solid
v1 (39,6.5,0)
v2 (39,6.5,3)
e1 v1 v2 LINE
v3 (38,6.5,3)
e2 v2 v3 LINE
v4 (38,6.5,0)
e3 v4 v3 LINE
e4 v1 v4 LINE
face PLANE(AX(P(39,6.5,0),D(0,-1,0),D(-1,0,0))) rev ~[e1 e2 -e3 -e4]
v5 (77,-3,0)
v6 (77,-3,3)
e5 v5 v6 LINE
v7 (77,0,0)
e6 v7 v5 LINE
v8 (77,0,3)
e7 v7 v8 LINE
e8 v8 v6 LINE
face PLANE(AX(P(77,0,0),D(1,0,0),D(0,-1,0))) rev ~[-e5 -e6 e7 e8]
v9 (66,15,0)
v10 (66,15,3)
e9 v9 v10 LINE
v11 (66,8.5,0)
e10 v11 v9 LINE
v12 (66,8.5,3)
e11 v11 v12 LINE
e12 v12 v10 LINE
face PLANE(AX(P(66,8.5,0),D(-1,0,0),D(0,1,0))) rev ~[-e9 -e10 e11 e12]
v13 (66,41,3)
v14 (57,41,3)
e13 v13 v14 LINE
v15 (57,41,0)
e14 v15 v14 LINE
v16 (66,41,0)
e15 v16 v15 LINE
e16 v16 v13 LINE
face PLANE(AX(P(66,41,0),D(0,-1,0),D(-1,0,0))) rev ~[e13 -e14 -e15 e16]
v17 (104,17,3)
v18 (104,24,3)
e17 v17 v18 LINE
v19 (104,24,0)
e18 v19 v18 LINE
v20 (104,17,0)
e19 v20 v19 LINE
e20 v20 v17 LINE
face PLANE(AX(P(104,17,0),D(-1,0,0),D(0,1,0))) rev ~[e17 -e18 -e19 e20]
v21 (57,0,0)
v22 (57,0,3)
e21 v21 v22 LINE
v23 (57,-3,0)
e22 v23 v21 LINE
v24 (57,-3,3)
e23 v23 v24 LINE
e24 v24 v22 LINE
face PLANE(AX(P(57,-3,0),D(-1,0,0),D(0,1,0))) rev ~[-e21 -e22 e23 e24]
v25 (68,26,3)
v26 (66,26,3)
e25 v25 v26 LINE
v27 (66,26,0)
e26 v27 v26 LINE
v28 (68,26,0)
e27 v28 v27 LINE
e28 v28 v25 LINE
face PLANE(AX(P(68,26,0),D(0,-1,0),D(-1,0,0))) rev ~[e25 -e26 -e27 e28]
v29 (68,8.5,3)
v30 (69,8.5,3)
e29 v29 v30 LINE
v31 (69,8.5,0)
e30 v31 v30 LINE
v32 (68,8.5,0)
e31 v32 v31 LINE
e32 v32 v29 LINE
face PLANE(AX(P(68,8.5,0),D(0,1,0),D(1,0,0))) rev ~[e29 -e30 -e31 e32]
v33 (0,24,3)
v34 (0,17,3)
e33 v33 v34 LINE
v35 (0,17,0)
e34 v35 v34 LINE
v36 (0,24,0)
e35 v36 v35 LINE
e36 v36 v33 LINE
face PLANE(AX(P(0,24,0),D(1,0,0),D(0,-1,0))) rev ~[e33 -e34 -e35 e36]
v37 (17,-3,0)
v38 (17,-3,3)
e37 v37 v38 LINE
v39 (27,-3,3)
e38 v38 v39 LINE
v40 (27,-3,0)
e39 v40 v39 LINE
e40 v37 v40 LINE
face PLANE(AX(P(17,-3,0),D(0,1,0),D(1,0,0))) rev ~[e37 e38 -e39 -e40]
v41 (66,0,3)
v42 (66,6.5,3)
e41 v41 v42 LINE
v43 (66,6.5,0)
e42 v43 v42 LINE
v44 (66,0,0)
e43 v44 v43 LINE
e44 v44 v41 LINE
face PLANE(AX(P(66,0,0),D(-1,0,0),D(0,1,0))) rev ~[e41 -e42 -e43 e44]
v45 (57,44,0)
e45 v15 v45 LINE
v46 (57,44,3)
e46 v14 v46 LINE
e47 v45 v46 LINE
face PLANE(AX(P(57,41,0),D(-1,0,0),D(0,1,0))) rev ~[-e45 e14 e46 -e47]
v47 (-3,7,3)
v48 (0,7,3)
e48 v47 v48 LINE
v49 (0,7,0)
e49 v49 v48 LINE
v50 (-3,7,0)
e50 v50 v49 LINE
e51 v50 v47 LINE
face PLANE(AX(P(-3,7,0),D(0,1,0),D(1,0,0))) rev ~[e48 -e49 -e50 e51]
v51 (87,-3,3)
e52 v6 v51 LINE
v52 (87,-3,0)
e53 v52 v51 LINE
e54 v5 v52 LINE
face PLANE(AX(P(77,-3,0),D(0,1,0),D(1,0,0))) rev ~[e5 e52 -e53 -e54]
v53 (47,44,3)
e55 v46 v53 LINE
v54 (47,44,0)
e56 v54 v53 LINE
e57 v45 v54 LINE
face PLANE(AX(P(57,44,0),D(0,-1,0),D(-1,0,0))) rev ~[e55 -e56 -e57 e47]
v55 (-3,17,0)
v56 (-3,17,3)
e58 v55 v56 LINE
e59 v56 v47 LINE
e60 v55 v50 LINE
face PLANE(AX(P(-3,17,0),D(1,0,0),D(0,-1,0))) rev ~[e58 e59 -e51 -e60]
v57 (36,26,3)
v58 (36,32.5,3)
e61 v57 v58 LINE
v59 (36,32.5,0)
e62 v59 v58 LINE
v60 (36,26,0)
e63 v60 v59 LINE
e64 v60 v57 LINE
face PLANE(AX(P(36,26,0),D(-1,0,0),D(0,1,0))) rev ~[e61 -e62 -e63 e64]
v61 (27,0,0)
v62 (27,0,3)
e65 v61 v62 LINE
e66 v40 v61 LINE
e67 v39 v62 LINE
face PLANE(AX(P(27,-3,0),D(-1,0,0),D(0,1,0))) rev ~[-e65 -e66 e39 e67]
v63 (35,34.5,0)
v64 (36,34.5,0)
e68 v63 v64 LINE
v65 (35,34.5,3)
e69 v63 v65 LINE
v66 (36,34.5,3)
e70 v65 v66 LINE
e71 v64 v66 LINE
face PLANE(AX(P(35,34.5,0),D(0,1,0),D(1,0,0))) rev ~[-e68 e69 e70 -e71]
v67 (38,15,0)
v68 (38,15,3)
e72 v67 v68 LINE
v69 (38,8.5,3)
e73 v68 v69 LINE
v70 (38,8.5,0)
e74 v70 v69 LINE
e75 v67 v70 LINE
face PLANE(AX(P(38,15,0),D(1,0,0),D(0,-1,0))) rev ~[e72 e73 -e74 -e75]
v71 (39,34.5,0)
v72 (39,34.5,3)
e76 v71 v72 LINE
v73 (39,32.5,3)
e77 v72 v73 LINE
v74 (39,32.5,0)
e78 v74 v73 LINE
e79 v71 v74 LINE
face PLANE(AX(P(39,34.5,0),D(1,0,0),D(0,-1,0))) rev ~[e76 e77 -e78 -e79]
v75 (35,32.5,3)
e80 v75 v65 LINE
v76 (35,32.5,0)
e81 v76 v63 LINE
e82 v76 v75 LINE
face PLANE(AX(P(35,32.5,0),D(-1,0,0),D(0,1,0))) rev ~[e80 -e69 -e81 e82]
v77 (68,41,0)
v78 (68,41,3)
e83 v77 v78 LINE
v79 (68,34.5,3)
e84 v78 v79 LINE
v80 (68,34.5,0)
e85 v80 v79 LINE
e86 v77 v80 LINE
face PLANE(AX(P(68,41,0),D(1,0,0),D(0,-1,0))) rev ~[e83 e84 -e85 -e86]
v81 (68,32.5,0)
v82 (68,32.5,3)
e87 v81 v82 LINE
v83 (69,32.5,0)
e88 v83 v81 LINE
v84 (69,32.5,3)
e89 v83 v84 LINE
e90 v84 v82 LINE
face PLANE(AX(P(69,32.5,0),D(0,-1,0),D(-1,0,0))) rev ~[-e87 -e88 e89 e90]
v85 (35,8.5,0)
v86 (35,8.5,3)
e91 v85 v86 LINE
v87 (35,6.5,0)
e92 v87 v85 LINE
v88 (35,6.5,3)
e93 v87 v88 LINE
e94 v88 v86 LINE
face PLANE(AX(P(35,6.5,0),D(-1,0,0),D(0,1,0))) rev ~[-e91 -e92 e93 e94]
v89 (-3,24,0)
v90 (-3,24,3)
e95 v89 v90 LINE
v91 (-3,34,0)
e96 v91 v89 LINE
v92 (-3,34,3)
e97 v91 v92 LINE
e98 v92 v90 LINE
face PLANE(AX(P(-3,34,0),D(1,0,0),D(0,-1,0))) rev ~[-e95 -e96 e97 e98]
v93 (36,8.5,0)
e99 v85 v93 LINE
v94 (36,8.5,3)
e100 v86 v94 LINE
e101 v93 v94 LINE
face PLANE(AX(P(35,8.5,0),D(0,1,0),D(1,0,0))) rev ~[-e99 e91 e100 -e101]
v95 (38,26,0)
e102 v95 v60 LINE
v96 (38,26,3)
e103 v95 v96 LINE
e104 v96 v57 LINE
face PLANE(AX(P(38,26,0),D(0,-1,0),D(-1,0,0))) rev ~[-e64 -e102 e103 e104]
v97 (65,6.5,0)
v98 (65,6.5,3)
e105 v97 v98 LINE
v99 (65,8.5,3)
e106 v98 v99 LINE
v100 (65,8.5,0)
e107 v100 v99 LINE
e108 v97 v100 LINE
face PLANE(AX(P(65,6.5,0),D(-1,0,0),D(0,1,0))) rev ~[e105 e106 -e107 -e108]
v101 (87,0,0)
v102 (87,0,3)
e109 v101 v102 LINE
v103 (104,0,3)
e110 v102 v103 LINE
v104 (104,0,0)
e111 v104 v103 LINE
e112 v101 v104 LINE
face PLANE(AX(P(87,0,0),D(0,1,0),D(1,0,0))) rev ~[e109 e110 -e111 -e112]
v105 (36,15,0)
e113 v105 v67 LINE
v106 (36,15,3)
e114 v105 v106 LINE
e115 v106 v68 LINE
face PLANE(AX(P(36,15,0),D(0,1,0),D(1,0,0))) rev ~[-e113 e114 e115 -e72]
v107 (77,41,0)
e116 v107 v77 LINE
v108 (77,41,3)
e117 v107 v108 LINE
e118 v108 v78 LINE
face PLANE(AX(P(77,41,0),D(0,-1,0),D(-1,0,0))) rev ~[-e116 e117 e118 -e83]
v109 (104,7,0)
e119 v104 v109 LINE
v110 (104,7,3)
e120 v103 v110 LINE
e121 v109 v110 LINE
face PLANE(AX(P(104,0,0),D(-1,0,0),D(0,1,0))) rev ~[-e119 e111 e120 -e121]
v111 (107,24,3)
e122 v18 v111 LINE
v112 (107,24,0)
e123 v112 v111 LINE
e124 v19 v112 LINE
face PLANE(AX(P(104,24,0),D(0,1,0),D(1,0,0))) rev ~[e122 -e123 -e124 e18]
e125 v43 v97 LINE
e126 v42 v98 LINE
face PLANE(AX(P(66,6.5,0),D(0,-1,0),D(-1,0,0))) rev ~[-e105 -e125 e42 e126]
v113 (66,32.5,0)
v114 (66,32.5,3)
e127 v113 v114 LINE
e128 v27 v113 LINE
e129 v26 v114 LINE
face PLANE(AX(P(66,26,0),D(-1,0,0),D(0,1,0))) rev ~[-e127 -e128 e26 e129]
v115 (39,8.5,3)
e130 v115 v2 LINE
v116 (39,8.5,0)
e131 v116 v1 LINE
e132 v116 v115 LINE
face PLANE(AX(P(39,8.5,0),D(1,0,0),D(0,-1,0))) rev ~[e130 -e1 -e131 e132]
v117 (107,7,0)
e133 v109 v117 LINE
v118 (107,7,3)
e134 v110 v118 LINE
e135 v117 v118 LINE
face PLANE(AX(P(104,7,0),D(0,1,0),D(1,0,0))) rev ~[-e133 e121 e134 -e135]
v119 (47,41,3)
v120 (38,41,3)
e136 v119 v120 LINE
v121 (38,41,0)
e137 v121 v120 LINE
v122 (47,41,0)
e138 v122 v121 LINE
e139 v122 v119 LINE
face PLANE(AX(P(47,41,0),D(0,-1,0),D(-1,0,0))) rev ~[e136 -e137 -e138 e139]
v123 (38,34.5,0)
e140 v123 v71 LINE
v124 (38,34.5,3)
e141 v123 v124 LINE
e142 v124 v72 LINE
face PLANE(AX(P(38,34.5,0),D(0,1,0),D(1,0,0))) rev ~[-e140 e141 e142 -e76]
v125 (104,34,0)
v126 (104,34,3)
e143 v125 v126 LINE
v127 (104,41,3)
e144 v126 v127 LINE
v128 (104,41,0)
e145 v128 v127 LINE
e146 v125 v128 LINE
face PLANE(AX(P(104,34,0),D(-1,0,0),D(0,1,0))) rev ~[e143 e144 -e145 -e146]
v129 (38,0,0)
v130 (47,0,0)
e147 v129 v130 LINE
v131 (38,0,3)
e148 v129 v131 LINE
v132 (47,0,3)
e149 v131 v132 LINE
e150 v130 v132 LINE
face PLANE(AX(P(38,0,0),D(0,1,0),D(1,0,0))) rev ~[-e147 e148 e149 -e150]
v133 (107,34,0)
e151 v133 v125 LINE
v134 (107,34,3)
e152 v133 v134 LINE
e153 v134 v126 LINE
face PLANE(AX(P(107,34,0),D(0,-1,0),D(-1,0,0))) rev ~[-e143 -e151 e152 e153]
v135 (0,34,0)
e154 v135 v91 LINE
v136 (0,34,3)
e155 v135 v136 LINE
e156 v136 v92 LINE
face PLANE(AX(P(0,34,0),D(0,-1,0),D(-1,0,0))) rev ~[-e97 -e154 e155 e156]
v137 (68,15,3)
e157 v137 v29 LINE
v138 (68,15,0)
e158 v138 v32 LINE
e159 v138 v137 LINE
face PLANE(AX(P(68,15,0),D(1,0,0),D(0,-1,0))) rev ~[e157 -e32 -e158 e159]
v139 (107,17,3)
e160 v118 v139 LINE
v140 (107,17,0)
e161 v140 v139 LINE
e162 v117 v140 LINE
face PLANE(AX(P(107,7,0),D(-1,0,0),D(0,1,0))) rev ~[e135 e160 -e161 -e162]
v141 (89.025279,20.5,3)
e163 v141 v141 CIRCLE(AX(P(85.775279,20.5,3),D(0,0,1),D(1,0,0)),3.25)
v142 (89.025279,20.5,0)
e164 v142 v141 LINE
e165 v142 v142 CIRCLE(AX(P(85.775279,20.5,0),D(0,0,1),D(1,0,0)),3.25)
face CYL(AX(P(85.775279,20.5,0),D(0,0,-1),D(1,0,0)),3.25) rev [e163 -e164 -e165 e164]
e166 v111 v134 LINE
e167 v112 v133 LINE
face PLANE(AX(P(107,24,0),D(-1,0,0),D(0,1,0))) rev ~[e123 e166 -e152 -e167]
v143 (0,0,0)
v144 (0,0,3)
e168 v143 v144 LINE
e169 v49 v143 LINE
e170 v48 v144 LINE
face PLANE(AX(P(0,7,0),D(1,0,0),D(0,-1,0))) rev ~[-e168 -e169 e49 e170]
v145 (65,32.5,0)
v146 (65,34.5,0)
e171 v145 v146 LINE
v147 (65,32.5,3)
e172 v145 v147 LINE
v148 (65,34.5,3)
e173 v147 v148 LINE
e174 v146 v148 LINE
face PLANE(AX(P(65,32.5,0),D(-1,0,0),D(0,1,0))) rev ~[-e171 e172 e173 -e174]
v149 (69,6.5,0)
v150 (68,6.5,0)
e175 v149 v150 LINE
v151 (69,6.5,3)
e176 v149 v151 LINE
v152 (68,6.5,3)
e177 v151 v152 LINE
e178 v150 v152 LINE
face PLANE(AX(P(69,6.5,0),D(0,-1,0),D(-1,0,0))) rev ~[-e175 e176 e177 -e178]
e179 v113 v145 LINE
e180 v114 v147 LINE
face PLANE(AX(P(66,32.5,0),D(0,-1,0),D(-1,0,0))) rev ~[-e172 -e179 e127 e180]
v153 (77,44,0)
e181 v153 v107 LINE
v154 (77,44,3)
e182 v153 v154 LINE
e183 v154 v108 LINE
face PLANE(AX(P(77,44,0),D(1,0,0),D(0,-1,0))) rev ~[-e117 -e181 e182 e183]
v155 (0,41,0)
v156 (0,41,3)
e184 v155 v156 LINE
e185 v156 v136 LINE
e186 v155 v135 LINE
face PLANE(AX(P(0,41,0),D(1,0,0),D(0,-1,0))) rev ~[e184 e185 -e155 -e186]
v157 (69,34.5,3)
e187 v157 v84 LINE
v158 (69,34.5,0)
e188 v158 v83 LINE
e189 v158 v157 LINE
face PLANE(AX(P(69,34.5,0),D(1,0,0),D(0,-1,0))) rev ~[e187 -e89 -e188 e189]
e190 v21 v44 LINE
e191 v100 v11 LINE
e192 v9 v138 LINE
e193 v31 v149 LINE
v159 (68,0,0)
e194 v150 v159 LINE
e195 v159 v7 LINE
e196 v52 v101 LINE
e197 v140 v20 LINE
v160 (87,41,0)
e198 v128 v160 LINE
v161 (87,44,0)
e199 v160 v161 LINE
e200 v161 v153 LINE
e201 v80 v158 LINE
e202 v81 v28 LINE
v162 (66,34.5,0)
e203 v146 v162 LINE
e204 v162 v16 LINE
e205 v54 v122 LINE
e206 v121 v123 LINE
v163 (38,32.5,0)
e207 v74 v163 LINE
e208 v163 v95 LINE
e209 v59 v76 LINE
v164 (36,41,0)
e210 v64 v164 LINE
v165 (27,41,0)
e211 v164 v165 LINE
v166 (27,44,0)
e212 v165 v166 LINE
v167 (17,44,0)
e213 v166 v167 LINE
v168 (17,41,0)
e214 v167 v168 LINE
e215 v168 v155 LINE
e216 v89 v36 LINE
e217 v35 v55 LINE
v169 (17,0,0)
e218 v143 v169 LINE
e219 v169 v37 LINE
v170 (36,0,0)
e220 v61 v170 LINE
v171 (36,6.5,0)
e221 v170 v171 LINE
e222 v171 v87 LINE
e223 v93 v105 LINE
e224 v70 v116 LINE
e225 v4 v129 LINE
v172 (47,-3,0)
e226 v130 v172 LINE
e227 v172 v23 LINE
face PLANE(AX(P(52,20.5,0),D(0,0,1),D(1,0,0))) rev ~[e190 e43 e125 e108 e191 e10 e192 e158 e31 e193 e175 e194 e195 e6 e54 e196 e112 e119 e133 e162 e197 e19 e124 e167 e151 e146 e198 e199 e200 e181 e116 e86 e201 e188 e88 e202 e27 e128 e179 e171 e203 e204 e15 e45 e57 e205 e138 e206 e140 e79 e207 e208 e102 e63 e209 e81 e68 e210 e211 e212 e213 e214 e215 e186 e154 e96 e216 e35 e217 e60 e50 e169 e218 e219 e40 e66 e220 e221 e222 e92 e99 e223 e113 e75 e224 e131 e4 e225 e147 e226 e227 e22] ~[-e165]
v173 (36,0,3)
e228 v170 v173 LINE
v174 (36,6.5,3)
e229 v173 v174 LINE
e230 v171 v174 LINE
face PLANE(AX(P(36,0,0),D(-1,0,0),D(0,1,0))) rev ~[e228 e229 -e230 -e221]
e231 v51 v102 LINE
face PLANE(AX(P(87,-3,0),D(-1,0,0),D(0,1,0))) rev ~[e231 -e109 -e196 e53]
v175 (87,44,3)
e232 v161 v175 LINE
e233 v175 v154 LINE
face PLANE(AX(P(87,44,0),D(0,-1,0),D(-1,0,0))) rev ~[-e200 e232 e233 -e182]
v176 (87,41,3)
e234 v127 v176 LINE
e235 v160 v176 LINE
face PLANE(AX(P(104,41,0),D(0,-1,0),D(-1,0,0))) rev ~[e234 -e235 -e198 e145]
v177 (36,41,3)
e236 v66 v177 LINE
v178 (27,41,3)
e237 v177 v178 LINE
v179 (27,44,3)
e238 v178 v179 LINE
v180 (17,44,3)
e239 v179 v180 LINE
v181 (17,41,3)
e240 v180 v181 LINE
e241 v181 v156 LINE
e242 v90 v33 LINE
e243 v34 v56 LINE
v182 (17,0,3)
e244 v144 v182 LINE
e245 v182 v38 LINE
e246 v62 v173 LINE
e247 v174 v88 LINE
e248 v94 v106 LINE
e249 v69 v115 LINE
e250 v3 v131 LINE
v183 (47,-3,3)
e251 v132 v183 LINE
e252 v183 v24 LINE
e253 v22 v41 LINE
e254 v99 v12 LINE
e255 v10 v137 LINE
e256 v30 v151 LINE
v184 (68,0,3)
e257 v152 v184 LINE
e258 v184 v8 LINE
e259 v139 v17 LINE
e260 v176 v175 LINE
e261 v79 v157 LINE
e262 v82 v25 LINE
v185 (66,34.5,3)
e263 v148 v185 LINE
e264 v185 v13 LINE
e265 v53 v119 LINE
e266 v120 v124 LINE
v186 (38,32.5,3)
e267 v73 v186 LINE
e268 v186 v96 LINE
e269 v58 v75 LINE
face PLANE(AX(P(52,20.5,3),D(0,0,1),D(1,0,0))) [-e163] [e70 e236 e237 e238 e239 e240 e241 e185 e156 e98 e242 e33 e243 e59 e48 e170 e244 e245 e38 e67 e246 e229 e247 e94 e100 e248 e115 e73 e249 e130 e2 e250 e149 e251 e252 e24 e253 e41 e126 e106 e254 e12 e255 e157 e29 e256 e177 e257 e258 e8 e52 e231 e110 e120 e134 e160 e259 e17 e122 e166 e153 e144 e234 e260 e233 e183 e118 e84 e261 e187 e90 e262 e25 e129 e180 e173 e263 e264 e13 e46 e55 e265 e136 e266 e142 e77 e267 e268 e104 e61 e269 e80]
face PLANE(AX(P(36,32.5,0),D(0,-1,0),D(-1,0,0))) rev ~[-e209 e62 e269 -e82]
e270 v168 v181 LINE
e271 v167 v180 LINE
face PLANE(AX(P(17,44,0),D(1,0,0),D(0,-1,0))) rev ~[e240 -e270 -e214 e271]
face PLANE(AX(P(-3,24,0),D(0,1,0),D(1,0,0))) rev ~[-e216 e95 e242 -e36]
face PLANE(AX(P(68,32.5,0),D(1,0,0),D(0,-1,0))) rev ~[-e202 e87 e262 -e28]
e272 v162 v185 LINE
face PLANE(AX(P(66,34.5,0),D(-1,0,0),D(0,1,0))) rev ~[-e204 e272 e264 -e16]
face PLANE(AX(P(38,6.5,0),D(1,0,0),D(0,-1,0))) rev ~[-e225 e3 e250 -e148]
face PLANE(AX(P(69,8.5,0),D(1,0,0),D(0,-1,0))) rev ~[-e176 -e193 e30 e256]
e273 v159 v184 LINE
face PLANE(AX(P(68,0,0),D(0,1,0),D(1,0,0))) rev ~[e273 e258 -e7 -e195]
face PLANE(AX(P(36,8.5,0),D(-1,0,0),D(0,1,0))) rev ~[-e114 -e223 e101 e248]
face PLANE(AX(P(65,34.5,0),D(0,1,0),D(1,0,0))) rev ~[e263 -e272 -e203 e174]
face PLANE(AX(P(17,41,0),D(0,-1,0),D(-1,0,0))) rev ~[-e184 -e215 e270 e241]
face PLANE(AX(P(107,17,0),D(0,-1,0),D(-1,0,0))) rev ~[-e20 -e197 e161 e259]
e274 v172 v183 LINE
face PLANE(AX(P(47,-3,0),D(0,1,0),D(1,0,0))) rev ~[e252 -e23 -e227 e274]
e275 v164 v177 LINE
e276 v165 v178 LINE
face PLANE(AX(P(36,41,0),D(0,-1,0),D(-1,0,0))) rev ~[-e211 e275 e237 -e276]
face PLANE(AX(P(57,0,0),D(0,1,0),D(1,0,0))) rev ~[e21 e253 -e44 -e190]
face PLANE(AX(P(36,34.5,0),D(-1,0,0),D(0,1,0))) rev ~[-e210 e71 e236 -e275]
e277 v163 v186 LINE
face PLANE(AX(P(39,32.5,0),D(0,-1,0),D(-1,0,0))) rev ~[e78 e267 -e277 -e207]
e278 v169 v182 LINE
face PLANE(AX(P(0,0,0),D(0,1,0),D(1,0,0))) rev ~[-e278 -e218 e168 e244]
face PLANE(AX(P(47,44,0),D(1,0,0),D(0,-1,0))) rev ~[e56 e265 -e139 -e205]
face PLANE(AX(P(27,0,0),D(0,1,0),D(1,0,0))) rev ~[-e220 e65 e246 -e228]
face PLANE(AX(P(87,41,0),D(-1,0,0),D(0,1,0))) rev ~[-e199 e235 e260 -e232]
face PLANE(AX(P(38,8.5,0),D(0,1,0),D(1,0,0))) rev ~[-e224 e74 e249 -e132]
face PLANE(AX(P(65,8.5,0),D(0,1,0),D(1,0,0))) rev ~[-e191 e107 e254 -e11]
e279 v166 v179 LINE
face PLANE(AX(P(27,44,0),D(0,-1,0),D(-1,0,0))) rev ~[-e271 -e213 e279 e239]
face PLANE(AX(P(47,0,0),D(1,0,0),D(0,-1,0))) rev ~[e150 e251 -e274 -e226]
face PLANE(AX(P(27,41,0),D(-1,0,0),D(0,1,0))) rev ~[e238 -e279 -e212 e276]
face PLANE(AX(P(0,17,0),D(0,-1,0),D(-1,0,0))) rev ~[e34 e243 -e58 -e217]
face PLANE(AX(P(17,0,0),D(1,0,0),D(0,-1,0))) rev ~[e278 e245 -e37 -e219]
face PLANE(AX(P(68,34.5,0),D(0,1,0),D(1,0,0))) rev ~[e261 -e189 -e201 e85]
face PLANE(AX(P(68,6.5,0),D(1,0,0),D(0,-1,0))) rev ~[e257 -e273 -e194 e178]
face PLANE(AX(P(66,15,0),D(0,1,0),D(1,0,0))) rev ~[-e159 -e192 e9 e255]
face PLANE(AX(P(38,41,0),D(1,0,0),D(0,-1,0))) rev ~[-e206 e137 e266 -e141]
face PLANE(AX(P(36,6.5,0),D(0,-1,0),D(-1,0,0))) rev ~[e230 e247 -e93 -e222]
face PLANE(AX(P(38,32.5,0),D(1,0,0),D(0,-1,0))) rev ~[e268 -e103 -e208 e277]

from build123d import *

# Parameters (mm, degrees)
F0_R     = 3.25
F1_DEPTH = 3


# Not quite as in the source:
# - a feature names something its author has since deleted; it is built from what else it names


with BuildPart() as f1:
    # F0 (on Top) → F1 (new body)
    with BuildSketch(Plane.XY):
        Polygon((0, 7), (0, 0), (17, 0), (17, -3), (27, -3), (27, 0), (36, 0), (36, 6.5), (35, 6.5), (35, 8.5), (36, 8.5), (36, 15), (38, 15), (38, 8.5), (39, 8.5), (39, 6.5), (38, 6.5), (38, 0), (47, 0), (47, -3), (57, -3), (57, 0), (66, 0), (66, 6.5), (65, 6.5), (65, 8.5), (66, 8.5), (66, 15), (68, 15), (68, 8.5), (69, 8.5), (69, 6.5), (68, 6.5), (68, 0), (77, 0), (77, -3), (87, -3), (87, 0), (104, 0), (104, 7), (107, 7), (107, 17), (104, 17), (104, 24), (107, 24), (107, 34), (104, 34), (104, 41), (87, 41), (87, 44), (77, 44), (77, 41), (68, 41), (68, 34.5), (69, 34.5), (69, 32.5), (68, 32.5), (68, 26), (66, 26), (66, 32.5), (65, 32.5), (65, 34.5), (66, 34.5), (66, 41), (57, 41), (57, 44), (47, 44), (47, 41), (38, 41), (38, 34.5), (39, 34.5), (39, 32.5), (38, 32.5), (38, 26), (36, 26), (36, 32.5), (35, 32.5), (35, 34.5), (36, 34.5), (36, 41), (27, 41), (27, 44), (17, 44), (17, 41), (0, 41), (0, 34), (-3, 34), (-3, 24), (0, 24), (0, 17), (-3, 17), (-3, 7), align=None)
        with Locations((85.7752785087, 20.5)):
            Circle(F0_R, mode=Mode.SUBTRACT)
    extrude(amount=F1_DEPTH)


solid = f1.part
